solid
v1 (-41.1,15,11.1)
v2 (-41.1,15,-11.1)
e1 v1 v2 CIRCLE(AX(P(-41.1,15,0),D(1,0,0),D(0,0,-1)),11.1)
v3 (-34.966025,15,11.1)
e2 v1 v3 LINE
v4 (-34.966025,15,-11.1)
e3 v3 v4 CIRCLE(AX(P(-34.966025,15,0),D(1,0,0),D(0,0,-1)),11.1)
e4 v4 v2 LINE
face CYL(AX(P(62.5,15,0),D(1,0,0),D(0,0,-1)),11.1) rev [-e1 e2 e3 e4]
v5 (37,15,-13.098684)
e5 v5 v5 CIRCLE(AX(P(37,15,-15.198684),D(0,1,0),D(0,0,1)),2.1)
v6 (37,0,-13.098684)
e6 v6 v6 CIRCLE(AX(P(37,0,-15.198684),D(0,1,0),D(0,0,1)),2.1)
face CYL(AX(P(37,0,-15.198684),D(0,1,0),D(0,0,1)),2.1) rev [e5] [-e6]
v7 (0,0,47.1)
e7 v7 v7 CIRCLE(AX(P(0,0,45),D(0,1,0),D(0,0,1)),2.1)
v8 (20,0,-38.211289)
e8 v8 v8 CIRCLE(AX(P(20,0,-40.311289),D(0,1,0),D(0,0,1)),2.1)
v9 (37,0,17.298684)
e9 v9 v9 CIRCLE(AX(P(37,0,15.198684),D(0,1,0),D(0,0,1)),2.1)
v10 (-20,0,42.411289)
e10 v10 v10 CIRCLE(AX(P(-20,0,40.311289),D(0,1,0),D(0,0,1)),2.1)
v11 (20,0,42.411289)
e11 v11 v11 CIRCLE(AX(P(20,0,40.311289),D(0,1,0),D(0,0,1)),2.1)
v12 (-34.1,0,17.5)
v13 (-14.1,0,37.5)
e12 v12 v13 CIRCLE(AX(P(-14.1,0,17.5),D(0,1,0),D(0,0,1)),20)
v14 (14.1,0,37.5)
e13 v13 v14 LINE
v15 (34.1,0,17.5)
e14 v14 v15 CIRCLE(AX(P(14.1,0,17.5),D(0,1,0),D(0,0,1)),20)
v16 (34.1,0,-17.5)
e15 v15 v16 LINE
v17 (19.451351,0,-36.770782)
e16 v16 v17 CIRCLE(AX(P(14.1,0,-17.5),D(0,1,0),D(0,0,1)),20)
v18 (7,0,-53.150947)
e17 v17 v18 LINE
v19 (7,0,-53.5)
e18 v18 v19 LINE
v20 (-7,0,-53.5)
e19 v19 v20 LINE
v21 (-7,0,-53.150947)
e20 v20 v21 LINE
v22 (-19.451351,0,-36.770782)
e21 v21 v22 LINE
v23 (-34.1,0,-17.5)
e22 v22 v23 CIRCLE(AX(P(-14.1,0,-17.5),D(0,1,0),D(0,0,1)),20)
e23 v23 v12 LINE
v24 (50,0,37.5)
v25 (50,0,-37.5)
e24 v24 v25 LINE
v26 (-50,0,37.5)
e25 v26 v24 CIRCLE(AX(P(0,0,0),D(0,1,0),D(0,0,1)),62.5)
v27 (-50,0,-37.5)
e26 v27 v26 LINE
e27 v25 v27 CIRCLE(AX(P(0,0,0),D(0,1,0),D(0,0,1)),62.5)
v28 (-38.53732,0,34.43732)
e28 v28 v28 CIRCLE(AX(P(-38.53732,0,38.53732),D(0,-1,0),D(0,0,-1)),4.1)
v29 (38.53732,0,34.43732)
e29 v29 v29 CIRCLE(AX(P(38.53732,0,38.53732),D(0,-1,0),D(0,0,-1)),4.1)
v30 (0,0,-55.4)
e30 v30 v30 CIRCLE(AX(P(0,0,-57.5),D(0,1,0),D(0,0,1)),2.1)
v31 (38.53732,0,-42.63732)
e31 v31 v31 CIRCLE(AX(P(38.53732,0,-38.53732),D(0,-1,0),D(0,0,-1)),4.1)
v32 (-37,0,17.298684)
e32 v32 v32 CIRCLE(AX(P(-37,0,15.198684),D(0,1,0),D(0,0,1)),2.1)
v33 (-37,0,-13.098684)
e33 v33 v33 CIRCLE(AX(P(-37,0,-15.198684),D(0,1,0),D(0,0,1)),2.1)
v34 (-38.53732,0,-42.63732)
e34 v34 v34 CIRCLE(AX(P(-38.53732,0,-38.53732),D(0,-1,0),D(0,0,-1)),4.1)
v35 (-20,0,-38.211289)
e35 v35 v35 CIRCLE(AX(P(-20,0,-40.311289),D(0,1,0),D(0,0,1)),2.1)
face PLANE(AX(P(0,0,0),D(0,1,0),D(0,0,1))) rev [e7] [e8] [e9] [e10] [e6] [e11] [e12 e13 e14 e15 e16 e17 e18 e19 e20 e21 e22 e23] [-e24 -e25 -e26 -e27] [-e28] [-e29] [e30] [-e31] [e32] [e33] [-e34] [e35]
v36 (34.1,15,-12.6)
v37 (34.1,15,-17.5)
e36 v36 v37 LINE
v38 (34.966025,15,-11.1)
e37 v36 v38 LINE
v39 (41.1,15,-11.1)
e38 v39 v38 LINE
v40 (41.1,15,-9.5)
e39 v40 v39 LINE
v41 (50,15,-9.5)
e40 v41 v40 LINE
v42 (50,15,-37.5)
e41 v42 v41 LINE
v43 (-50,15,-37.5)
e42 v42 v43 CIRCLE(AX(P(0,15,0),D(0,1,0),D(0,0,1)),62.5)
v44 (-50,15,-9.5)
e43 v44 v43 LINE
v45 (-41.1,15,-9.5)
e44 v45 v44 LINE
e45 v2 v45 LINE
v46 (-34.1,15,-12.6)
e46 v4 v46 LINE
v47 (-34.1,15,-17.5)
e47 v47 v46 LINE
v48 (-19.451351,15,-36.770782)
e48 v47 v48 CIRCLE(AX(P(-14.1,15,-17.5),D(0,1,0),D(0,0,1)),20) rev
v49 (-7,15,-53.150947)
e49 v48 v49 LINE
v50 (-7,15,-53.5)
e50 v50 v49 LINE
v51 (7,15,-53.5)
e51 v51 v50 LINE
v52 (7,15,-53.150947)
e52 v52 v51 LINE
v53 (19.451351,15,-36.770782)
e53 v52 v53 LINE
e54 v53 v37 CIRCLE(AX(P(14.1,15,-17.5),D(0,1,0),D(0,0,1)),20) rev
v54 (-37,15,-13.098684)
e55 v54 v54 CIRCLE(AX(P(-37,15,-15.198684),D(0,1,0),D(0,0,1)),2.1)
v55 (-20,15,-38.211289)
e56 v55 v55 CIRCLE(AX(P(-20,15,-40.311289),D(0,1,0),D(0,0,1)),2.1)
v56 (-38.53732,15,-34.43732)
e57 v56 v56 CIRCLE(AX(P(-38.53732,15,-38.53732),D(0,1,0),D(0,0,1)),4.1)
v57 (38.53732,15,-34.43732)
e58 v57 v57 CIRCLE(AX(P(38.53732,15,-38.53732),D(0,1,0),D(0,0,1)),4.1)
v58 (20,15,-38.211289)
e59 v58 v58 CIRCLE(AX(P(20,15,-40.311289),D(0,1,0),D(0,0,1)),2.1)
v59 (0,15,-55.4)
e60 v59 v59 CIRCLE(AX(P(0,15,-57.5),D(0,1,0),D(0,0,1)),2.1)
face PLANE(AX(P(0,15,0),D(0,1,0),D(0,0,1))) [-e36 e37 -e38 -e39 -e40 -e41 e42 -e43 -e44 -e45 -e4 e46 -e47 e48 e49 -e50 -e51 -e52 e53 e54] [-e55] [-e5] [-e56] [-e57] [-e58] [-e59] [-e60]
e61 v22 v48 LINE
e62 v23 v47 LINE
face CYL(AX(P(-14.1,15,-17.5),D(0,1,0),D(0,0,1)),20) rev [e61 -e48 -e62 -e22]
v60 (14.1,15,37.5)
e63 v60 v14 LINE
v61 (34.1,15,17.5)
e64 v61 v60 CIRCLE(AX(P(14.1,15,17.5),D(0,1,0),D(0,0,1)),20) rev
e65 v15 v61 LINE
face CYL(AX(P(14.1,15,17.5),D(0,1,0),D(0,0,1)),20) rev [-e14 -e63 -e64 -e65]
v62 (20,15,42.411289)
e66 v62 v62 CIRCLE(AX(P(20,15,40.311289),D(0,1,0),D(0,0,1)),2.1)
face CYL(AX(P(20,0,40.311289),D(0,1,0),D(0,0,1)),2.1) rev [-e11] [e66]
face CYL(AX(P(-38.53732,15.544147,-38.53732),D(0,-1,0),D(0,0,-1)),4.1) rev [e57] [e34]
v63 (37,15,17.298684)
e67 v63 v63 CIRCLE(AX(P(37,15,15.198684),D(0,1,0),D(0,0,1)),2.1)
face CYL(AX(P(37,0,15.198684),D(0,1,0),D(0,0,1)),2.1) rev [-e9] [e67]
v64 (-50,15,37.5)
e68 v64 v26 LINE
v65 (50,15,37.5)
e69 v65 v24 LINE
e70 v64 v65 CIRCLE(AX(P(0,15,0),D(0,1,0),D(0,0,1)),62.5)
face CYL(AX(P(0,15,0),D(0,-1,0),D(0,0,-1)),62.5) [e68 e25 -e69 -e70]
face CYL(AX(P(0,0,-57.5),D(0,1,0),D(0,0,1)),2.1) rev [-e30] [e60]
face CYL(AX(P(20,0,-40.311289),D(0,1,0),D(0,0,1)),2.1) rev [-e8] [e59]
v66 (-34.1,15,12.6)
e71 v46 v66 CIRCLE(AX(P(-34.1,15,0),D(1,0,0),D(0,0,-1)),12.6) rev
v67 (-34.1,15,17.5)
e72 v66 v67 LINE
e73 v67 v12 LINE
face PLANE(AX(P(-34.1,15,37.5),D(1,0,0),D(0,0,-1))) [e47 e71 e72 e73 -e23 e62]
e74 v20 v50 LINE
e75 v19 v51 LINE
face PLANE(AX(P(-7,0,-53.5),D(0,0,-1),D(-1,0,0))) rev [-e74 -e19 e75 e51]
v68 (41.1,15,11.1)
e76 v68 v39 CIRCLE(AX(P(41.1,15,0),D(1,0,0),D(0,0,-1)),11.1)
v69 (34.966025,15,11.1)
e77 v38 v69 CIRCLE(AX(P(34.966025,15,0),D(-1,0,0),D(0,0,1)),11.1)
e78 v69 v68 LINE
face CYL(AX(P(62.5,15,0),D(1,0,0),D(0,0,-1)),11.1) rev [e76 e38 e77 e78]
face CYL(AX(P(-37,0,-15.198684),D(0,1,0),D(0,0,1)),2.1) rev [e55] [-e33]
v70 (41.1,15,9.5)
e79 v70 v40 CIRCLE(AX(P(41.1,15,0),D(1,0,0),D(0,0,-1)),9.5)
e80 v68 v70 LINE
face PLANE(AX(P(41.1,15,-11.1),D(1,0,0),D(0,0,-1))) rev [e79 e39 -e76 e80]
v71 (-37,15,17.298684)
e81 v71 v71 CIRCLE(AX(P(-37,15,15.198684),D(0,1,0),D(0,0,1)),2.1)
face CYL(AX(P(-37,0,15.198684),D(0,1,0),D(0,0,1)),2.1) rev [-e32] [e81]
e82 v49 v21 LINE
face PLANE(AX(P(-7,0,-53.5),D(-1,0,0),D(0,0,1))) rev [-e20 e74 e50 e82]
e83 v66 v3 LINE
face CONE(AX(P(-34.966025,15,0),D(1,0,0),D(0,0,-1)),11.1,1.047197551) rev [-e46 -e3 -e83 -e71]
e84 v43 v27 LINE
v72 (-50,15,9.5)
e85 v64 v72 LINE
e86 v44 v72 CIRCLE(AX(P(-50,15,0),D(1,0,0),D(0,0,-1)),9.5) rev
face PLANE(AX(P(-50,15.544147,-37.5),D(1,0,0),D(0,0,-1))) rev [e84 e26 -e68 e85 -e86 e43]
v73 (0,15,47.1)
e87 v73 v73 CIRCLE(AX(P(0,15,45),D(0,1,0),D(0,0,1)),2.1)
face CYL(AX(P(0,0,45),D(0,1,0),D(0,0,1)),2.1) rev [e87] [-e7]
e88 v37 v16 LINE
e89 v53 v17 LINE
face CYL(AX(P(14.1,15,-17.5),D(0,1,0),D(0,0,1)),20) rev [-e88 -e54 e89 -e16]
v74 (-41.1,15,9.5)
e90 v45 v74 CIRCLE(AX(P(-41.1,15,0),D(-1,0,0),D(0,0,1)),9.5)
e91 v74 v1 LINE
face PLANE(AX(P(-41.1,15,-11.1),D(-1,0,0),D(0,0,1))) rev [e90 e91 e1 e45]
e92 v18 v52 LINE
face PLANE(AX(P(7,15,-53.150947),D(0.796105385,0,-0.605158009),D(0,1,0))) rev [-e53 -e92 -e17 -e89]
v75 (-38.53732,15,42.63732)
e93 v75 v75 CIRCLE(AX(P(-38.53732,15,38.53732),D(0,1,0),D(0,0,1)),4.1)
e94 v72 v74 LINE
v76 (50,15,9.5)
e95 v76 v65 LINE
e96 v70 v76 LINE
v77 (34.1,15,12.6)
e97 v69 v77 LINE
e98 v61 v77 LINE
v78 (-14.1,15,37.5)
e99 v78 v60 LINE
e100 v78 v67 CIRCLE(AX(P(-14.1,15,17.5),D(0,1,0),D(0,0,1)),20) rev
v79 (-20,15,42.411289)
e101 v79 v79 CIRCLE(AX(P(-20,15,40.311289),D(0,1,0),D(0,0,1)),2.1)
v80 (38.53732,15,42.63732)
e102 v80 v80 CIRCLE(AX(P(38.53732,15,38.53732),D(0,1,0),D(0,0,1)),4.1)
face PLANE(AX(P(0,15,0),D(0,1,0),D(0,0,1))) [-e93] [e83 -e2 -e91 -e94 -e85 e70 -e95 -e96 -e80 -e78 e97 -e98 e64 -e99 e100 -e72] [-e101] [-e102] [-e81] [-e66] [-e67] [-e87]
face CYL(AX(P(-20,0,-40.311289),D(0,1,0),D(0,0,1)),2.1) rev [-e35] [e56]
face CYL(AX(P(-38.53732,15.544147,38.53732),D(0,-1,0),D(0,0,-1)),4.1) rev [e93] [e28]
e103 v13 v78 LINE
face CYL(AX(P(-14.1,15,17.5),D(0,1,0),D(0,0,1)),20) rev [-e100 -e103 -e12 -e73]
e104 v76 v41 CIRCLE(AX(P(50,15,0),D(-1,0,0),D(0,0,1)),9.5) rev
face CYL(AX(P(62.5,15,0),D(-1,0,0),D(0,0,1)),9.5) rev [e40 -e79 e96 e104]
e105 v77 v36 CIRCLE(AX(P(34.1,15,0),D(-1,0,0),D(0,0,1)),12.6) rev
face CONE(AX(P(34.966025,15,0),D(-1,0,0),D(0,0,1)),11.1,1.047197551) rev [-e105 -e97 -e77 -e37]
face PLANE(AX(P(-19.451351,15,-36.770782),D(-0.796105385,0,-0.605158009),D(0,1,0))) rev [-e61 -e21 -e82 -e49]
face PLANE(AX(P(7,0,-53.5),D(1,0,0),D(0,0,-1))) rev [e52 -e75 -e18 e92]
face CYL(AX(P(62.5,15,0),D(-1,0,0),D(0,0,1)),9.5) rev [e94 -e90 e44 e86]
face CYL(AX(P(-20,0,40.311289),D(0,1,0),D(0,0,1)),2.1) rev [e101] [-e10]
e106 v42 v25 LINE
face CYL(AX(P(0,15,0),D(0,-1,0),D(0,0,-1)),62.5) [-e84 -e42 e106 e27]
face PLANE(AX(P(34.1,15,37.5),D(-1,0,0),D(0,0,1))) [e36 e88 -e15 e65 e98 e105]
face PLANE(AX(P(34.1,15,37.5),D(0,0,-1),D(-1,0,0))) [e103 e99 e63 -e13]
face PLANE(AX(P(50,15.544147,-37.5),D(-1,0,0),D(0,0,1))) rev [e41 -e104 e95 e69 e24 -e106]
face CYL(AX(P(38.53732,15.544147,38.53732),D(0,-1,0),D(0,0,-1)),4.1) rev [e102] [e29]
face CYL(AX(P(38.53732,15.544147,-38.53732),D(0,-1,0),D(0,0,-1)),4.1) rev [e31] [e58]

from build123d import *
from OCP.BRepFilletAPI import BRepFilletAPI_MakeChamfer

# Parameters (mm, degrees)
SKETCH2_R               = 62.5
SKETCH2_W               = 68.2
SKETCH2_H               = 75
BOSS_EXTRUDE1_DEPTH     = 15
SKETCH7_W               = 7
SKETCH7_H               = 11.1
CUT_EXTRUDE1_DEPTH      = 122.918866465
CUT_EXTRUDE1_DEPTH_BACK = 122.918866465
SKETCH8_R               = 9.5
FILLET1_R               = 20
SKETCH9_R               = 2.1
CUT_EXTRUDE2_DEPTH      = 90.652105542
CHAMFER1_SIZE           = 1.5
CHAMFER1_SIZE2          = 0.866025404
SKETCH10_R              = 4.1
CUT_EXTRUDE3_DEPTH      = 90.652105542
CUT_EXTRUDE4_DEPTH      = 90.652105542
SKETCH12_W              = 14
SKETCH12_H              = 16
CUT_EXTRUDE5_DEPTH      = 90.652105542
CHAMFER2_DEPTH          = 15
CUT_EXTRUDE6_DEPTH      = 90.652105542


with BuildPart() as part:
    # Sketch2 → Boss-Extrude1 (new body)
    with BuildSketch(Plane(origin=(0, 0, 0), x_dir=(1, 0, 0), z_dir=(0, 1, 0))):
        with Locations(Location((0, 0, 0), (0, 0, 270))):
            Circle(SKETCH2_R)
        Rectangle(SKETCH2_W, SKETCH2_H, mode=Mode.SUBTRACT)
    extrude(amount=BOSS_EXTRUDE1_DEPTH)

    # Sketch7 → Cut-Revolve2 (revolve, cut)
    with BuildSketch(Plane(origin=(0, 15, 0), x_dir=(1, 0, 0), z_dir=(0, 1, 0))):
        with Locations((-37.6, 5.55)):
            Rectangle(SKETCH7_W, SKETCH7_H)
        with Locations((37.6, 5.55)):
            Rectangle(SKETCH7_W, SKETCH7_H)
    revolve(axis=Axis((62.5, 15, 0), (-1, 0, 0)), mode=Mode.SUBTRACT)

    # Sketch8 → Cut-Extrude1 (cut, two sides: drawn at the far end of the back side and taken through both)
    with BuildSketch(Plane.ZY.offset(-41.1).offset(-CUT_EXTRUDE1_DEPTH_BACK)):
        with Locations((0, 15)):
            Circle(SKETCH8_R)
    extrude(amount=CUT_EXTRUDE1_DEPTH + CUT_EXTRUDE1_DEPTH_BACK, mode=Mode.SUBTRACT)

    # Fillet1
    fillet1_edges = [part.edges().sort_by_distance(p)[0] for p in [
        (-34.1, 7.5, -37.5),
        (-34.1, 7.5, 37.5),
        (34.1, 7.5, 37.5),
        (34.1, 7.5, -37.5),
    ]]
    fillet(fillet1_edges, radius=FILLET1_R)

    # Sketch9 → Cut-Extrude2 (cut, through all)
    with BuildSketch(Plane(origin=(0, 15, 0), x_dir=(1, 0, 0), z_dir=(0, 1, 0))):
        with Locations(Location((-37, 15.198684154, 0), (0, 0, 270))):
            Circle(SKETCH9_R)
        with Locations(Location((37, 15.198684154, 0), (0, 0, 270))):
            Circle(SKETCH9_R)
        with Locations(Location((37, -15.198684154, 0), (0, 0, 270))):
            Circle(SKETCH9_R)
        with Locations(Location((-37, -15.198684154, 0), (0, 0, 270))):
            Circle(SKETCH9_R)
        with Locations(Location((-20, 40.311288741, 0), (0, 0, 270))):
            Circle(SKETCH9_R)
        with Locations(Location((20, 40.311288741, 0), (0, 0, 270))):
            Circle(SKETCH9_R)
        with Locations(Location((20, -40.311288741, 0), (0, 0, 270))):
            Circle(SKETCH9_R)
        with Locations(Location((-20, -40.311288741, 0), (0, 0, 270))):
            Circle(SKETCH9_R)
        with Locations(Location((0, -45, 0), (0, 0, 270))):
            Circle(SKETCH9_R)
        with Locations(Location((0, 57.5, 0), (0, 0, 270))):
            Circle(SKETCH9_R)
    extrude(amount=-CUT_EXTRUDE2_DEPTH, mode=Mode.SUBTRACT)

    # Chamfer1: one chamfer whose edges measure the first distance from different faces: ONE call of the kernel's chamfer builder (chamfer() names one face for all edges)
    chamfer1_edges_1 = [part.edges().sort_by_distance(p)[0] for p in [
        (-34.1, 3.9, 0),
    ]]
    chamfer1_side_1 = [part.faces().sort_by_distance(p)[0] for p in [
        (-34.1, 0.380788655, 0),
    ]]
    chamfer1_edges_2 = [part.edges().sort_by_distance(p)[0] for p in [
        (34.1, 3.9, 0),
    ]]
    chamfer1_side_2 = [part.faces().sort_by_distance(p)[0] for p in [
        (34.1, 0.380788655, 0),
    ]]
    chamfer1 = BRepFilletAPI_MakeChamfer(part.part.solid().wrapped)
    for e in chamfer1_edges_1:
        chamfer1.Add(CHAMFER1_SIZE, CHAMFER1_SIZE2, e.wrapped, chamfer1_side_1[0].wrapped)  # the first distance lies on this face
    for e in chamfer1_edges_2:
        chamfer1.Add(CHAMFER1_SIZE, CHAMFER1_SIZE2, e.wrapped, chamfer1_side_2[0].wrapped)  # the first distance lies on this face
    add(Compound.cast(chamfer1.Shape()), mode=Mode.REPLACE)

    # Sketch10 → Cut-Extrude3 (cut, through all)
    with BuildSketch(Plane.XZ):
        with Locations(Location((38.537319575, -38.537319575, 0), (0, 0, 270))):
            Circle(SKETCH10_R)
        with Locations(Location((-38.537319575, -38.537319575, 0), (0, 0, 270))):
            Circle(SKETCH10_R)
        with Locations(Location((-38.537319575, 38.537319575, 0), (0, 0, 270))):
            Circle(SKETCH10_R)
        with Locations(Location((38.537319575, 38.537319575, 0), (0, 0, 270))):
            Circle(SKETCH10_R)
    extrude(amount=-CUT_EXTRUDE3_DEPTH, mode=Mode.SUBTRACT)

    # Sketch11 → Cut-Extrude4 (cut, through all)
    with BuildSketch(Plane.XZ):
        with BuildLine():
            Line((50, -37.5), (50, 37.5))
            ThreePointArc((50, 37.5), (62.5, 0), (50, -37.5))
        make_face()
    extrude(amount=-CUT_EXTRUDE4_DEPTH, mode=Mode.SUBTRACT)

    # Sketch12 → Cut-Extrude5 (cut, through all)
    with BuildSketch(Plane(origin=(0, 15, 0), x_dir=(1, 0, 0), z_dir=(0, 1, 0))):
        with Locations((0, 45.5)):
            Rectangle(SKETCH12_W, SKETCH12_H)
    extrude(amount=-CUT_EXTRUDE5_DEPTH, mode=Mode.SUBTRACT)

    # Chamfer2: read off the stored shape, not the designer's step
    # Chamfer2 outline → Chamfer2 (cut)
    with BuildSketch(Plane(origin=(0, 0, 0), x_dir=(1, 0, 0), z_dir=(0, 1, 0))):
        with BuildLine():
            ThreePointArc((14.1, 37.5), (16.800403682, 37.316856965), (19.451351351, 36.770781996))
            Line((19.451351351, 36.770781996), (7, 53.150946691))
            Line((7, 53.150946691), (7, 37.5))
            Line((7, 37.5), (14.1, 37.5))
        make_face()
        with BuildLine():
            Line((-7, 37.5), (-7, 53.150946691))
            Line((-7, 53.150946691), (-19.451351351, 36.770781996))
            ThreePointArc((-19.451351351, 36.770781996), (-16.800403682, 37.316856965), (-14.1, 37.5))
            Line((-14.1, 37.5), (-7, 37.5))
        make_face()
    extrude(amount=CHAMFER2_DEPTH, mode=Mode.SUBTRACT)

    # Sketch13 → Cut-Extrude6 (cut, through all)
    with BuildSketch(Plane.XZ):
        with BuildLine():
            Line((-50, -37.5), (-50, 37.5))
            ThreePointArc((-50, 37.5), (-62.5, 0), (-50, -37.5))
        make_face()
    extrude(amount=-CUT_EXTRUDE6_DEPTH, mode=Mode.SUBTRACT)


solid = part.part
